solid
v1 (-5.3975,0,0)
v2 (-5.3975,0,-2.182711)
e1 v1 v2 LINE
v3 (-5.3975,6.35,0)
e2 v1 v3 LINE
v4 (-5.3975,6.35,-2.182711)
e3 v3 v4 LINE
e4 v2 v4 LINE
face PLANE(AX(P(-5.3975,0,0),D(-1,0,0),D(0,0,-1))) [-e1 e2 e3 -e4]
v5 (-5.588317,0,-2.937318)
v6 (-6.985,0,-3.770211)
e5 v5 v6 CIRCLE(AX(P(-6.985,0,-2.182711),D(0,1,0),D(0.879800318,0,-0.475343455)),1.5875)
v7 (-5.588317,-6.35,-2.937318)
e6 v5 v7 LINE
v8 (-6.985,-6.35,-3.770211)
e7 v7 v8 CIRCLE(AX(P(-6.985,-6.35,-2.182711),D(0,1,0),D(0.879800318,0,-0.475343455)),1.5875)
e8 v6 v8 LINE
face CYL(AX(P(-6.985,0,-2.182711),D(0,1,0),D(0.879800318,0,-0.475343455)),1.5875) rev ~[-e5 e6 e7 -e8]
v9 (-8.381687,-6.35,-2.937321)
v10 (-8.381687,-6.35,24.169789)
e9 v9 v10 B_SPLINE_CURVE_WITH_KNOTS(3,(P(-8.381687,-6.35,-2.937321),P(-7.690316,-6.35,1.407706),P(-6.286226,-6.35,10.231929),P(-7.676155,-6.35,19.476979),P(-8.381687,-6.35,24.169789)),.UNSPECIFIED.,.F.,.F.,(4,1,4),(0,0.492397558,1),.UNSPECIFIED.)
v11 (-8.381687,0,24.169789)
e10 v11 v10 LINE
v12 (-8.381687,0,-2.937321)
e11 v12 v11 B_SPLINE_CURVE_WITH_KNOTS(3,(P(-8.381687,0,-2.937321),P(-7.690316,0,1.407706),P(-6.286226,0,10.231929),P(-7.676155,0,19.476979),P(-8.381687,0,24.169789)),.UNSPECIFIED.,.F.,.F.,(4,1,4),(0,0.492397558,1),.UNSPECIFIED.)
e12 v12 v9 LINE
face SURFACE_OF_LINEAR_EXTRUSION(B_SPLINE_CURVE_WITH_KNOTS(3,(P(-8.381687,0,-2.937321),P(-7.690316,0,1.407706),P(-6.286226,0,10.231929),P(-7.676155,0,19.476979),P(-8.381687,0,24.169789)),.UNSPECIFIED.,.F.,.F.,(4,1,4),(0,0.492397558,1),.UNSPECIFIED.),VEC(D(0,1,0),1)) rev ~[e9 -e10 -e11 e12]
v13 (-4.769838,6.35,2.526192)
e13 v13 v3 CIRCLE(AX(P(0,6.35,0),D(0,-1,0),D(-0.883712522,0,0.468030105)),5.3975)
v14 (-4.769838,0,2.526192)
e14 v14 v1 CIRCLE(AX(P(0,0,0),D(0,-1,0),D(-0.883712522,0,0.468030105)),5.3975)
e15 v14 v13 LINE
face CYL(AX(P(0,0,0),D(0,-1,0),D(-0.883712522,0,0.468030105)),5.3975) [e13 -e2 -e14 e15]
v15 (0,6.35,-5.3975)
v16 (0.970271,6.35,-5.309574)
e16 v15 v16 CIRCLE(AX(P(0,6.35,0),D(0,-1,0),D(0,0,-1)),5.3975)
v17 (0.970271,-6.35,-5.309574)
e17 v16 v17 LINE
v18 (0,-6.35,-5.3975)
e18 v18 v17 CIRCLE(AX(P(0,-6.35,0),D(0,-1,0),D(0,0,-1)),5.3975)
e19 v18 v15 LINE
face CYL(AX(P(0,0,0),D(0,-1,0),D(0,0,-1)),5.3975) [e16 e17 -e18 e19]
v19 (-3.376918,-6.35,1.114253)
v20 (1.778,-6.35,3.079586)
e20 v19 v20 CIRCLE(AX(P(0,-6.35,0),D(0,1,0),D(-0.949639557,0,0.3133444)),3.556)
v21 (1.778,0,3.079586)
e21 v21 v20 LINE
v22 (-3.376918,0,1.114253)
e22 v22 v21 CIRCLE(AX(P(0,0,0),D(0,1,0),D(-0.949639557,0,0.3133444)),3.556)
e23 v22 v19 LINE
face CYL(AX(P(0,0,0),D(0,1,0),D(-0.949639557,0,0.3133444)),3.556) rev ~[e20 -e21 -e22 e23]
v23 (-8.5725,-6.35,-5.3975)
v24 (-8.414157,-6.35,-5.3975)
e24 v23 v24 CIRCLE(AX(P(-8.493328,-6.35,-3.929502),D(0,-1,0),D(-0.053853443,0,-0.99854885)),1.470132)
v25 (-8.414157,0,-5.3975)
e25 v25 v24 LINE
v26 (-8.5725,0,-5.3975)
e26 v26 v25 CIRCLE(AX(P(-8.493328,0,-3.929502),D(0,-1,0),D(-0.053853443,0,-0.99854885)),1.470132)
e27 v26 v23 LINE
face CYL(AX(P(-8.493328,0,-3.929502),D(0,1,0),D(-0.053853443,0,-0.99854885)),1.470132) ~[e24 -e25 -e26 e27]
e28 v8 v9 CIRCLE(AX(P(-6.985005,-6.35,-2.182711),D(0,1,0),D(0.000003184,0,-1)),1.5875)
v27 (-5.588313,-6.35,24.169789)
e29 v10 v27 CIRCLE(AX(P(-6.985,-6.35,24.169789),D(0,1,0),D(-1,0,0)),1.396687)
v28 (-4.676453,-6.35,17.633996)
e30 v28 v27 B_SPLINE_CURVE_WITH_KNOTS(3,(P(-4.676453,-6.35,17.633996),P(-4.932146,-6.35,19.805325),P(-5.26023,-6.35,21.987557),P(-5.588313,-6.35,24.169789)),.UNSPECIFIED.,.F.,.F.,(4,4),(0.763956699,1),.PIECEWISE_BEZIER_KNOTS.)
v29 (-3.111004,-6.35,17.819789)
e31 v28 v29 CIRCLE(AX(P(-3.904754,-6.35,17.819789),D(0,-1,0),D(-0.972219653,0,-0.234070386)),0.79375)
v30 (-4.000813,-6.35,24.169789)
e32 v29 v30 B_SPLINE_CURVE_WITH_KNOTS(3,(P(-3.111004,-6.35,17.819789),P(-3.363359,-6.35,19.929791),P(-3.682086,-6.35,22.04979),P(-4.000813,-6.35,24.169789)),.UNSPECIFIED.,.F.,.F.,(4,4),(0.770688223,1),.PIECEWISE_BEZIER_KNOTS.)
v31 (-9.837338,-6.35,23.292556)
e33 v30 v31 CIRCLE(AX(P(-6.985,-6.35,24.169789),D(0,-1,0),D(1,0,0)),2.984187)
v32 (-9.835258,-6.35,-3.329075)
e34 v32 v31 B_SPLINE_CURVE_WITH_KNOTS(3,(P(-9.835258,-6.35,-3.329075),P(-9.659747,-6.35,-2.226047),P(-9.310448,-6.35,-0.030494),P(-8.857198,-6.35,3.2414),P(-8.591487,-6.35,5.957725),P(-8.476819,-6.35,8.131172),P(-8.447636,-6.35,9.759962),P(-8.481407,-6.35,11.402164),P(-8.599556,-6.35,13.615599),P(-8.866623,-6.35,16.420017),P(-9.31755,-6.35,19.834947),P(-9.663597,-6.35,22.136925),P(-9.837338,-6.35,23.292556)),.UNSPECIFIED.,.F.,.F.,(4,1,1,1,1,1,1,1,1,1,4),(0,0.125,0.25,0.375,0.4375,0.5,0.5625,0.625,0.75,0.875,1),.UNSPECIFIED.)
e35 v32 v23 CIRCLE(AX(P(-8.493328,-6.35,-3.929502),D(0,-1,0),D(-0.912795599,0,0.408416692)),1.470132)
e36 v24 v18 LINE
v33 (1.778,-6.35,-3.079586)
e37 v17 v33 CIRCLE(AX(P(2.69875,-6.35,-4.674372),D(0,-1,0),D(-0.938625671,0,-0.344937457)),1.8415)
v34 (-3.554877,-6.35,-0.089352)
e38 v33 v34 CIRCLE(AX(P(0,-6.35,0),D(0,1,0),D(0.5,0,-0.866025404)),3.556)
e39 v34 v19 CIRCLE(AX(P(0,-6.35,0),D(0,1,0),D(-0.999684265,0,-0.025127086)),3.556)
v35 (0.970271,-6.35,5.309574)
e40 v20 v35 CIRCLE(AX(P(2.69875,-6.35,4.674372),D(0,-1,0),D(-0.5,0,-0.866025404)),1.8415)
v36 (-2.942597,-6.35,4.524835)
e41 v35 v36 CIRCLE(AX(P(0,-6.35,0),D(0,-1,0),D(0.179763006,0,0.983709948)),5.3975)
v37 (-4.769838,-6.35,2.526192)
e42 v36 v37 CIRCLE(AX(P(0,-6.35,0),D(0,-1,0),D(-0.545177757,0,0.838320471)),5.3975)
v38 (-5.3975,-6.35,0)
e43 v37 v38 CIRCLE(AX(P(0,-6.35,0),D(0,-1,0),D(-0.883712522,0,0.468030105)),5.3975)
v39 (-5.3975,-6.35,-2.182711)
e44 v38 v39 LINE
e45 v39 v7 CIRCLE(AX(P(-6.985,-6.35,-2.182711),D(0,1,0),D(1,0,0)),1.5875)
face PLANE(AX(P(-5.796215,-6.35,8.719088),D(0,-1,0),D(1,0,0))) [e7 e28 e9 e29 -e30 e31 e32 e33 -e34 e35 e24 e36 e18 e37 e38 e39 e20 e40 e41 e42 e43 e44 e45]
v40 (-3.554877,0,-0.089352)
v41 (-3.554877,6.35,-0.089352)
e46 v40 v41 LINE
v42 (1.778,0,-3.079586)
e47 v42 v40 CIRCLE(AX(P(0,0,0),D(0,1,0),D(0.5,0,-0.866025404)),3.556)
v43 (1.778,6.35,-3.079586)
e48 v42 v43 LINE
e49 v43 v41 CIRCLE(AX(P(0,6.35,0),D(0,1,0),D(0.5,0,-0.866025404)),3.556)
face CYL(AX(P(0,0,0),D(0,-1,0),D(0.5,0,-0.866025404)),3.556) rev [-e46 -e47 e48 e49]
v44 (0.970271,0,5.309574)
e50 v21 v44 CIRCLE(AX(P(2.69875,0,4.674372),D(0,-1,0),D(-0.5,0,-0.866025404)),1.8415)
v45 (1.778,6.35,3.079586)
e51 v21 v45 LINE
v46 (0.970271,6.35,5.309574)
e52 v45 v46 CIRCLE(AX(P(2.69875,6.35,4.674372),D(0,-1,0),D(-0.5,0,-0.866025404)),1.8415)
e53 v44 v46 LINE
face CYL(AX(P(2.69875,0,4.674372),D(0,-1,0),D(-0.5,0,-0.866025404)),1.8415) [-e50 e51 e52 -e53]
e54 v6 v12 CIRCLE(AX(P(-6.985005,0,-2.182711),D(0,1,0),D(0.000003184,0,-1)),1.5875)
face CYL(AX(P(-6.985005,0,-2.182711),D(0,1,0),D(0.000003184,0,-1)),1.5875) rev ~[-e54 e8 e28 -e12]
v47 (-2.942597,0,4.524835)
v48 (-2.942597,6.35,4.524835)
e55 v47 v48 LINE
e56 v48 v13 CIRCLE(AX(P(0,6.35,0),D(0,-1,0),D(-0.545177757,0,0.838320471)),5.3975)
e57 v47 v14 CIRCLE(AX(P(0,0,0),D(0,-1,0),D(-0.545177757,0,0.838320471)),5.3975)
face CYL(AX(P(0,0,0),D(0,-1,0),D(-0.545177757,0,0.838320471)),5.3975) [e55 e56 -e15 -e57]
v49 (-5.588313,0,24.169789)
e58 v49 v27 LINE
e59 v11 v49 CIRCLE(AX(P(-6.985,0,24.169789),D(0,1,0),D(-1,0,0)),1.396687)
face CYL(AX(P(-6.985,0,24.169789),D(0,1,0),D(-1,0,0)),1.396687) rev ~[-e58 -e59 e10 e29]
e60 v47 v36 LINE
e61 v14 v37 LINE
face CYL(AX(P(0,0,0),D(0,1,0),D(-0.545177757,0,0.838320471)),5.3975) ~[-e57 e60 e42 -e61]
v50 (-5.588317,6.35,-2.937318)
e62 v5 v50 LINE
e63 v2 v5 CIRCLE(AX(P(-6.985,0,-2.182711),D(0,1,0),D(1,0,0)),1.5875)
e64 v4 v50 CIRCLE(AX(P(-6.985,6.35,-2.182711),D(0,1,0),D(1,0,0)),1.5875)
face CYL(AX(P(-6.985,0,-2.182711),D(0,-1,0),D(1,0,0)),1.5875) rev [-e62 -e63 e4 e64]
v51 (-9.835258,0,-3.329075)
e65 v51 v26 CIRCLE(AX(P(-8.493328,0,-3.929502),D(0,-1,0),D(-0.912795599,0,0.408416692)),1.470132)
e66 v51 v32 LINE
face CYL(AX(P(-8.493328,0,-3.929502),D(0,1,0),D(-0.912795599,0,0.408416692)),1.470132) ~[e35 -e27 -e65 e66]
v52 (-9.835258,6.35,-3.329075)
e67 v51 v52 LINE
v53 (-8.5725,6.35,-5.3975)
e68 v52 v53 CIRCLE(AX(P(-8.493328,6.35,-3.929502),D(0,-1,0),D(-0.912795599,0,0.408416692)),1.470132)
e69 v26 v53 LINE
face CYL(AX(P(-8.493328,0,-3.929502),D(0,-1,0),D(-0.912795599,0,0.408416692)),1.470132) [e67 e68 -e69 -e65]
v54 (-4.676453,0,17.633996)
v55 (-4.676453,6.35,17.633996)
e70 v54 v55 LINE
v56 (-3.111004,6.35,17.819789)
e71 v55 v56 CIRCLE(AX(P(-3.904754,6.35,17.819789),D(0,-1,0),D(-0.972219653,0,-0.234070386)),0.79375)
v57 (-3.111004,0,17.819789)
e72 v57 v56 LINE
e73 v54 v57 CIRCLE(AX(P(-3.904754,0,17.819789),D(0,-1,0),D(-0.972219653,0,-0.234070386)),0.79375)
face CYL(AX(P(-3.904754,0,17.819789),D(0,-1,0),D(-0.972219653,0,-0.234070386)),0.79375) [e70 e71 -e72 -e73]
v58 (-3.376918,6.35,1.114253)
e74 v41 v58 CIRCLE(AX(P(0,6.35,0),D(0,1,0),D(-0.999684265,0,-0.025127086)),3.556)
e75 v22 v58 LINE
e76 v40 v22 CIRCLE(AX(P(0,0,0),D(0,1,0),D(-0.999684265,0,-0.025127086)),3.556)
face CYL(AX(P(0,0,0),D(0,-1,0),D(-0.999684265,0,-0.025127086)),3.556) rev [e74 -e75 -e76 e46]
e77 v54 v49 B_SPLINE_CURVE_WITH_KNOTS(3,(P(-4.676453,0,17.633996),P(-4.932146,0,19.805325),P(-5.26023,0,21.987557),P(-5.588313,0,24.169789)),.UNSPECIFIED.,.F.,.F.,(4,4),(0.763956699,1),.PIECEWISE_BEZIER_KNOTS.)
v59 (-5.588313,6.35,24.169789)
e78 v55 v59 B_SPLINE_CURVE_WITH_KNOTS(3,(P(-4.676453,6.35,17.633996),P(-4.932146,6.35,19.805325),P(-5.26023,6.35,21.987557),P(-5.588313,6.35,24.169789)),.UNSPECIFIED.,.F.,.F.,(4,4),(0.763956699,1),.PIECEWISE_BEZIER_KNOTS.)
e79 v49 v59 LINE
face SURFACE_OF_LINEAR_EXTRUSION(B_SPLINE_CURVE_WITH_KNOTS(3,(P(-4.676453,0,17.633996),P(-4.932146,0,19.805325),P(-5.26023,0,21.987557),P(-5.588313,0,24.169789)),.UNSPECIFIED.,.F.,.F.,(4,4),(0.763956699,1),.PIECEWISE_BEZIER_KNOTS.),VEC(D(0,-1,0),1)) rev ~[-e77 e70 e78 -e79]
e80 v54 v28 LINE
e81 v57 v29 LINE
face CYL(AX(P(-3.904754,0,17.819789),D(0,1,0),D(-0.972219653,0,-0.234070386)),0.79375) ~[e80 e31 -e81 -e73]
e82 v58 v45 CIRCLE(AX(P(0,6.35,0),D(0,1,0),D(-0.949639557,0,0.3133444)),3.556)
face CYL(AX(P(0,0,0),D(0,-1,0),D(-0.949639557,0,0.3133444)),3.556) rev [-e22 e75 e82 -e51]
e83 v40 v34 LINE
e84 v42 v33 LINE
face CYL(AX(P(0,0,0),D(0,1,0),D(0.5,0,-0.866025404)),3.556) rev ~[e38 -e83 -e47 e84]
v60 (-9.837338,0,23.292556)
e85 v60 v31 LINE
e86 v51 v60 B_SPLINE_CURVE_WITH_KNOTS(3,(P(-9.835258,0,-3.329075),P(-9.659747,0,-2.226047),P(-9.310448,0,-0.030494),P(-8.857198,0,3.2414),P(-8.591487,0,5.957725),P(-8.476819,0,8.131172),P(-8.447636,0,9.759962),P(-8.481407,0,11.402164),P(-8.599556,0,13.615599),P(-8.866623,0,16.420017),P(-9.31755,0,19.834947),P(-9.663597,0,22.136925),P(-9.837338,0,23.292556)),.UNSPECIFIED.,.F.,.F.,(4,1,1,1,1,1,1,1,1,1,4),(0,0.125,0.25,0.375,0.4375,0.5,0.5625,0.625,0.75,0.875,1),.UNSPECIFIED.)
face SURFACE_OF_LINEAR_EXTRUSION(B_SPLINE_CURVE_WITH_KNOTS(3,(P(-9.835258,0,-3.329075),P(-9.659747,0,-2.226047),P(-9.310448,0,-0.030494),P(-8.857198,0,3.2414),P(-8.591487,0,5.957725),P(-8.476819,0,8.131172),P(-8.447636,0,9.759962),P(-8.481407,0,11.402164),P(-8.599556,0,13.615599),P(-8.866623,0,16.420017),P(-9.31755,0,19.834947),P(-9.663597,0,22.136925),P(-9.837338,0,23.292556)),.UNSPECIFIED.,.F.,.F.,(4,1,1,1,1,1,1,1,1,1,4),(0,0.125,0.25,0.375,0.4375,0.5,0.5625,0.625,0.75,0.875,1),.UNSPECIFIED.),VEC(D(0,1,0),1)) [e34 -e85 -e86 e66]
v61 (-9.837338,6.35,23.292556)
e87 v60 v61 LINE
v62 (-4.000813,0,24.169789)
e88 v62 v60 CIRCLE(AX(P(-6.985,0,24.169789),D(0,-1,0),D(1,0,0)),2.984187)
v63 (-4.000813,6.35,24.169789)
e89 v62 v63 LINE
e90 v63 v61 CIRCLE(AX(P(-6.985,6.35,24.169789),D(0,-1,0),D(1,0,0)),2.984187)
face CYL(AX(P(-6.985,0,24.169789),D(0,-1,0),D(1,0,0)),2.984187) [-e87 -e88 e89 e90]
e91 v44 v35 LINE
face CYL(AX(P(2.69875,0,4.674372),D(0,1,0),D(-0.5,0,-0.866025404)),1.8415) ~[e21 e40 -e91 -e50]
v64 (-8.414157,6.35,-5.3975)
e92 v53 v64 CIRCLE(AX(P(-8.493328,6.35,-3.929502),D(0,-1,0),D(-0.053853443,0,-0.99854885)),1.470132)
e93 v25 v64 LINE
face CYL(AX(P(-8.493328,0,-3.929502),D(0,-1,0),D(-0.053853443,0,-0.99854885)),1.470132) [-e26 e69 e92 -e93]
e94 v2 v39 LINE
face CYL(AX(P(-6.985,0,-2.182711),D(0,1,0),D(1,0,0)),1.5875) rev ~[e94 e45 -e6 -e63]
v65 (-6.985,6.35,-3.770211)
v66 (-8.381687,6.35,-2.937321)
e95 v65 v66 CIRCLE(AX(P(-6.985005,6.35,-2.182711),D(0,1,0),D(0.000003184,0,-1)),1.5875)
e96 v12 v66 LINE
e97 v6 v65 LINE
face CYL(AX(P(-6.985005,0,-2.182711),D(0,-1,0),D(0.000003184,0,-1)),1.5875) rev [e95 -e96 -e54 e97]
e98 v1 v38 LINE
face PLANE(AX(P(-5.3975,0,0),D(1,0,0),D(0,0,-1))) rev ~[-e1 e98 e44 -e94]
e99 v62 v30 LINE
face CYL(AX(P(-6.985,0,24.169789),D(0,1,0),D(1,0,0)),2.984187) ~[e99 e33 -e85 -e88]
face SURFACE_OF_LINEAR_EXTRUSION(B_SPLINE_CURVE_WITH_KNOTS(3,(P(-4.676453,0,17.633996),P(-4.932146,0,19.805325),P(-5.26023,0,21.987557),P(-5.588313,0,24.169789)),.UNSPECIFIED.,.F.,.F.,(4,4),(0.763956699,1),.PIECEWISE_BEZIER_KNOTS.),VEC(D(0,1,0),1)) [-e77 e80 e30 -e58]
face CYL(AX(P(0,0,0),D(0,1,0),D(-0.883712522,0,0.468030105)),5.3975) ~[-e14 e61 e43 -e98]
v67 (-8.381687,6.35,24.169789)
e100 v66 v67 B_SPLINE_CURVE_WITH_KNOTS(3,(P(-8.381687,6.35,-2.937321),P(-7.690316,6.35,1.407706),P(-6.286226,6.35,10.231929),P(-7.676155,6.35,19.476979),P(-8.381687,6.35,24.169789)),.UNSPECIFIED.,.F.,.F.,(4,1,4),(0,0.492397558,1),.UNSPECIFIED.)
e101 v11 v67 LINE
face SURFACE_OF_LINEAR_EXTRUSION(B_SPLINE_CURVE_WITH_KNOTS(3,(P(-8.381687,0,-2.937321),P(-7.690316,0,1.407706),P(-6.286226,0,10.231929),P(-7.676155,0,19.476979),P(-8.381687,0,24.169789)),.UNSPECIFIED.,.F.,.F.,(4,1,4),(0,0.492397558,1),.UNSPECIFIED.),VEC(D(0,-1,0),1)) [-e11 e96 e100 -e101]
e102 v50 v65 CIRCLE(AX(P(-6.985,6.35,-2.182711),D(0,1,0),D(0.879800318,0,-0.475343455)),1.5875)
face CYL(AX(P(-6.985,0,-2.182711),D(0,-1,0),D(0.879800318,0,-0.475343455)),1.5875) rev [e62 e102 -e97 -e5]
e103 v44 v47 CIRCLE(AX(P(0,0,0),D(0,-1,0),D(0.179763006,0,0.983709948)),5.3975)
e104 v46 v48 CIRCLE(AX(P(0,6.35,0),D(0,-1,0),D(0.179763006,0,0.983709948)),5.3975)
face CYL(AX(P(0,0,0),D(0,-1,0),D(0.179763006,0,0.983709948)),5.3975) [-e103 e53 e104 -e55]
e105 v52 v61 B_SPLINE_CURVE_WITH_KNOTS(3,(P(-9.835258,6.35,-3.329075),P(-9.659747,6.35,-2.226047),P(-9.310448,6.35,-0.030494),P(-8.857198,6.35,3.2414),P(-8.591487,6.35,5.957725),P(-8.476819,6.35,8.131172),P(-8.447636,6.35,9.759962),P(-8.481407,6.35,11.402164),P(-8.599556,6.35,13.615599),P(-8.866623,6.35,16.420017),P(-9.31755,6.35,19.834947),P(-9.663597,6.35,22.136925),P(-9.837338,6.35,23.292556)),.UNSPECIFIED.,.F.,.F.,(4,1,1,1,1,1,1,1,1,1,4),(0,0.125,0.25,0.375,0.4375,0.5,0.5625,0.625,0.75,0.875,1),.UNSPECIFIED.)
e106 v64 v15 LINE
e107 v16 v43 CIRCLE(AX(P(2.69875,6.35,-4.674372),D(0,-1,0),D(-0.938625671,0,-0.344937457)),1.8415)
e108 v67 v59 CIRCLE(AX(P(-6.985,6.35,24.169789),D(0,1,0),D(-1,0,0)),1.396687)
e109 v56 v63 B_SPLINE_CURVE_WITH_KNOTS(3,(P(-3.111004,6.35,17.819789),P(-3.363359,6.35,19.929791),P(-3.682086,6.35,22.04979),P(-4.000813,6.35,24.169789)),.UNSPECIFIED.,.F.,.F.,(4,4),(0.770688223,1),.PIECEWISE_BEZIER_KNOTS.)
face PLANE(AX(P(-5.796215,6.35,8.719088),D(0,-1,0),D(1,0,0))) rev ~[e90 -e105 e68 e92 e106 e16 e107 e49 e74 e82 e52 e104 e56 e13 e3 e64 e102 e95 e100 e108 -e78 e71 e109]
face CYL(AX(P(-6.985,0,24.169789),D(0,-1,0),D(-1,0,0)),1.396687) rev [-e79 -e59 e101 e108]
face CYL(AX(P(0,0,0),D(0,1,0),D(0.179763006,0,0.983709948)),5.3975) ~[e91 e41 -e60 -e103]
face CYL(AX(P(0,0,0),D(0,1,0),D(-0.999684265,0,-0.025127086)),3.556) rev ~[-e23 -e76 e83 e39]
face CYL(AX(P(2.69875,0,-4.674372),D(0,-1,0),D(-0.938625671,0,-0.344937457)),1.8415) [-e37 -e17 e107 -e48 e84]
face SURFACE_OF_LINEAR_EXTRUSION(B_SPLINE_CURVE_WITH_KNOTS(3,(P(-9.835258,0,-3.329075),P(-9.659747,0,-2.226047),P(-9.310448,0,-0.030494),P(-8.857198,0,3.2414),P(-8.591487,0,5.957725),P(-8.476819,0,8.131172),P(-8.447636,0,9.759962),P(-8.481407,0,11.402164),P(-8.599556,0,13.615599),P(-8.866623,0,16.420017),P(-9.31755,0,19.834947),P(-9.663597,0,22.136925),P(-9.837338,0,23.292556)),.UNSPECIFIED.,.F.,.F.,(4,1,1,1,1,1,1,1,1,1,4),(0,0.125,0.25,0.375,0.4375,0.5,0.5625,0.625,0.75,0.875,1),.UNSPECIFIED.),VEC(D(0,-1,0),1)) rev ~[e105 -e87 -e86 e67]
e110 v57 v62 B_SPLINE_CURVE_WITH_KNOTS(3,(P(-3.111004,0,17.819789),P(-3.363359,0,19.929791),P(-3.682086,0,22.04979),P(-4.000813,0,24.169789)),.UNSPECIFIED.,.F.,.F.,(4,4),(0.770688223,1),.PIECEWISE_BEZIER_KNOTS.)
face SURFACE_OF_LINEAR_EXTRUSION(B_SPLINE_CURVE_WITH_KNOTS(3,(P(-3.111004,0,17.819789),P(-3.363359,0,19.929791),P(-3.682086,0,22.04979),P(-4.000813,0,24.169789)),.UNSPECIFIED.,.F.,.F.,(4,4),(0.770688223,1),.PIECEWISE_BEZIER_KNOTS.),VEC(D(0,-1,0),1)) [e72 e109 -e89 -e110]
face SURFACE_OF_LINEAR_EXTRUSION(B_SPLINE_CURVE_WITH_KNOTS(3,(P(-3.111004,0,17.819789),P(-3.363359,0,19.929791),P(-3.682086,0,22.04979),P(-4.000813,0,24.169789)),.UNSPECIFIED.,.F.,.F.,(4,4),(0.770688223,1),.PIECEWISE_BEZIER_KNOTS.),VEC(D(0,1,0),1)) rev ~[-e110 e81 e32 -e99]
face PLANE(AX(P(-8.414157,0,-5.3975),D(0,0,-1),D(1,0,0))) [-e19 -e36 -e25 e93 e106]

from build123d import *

# Parameters (mm, degrees)
F1_DEPTH = 6.35


# Not quite as in the source:
# - ends of sketch curves that miss each other by under 0.0002 mm in the source are joined
# - the dataset's text gives a spline's control points without its knots; the knots are read off the source's solid


with BuildPart() as f1:
    # F0 (on Front) → F1 (new body, symmetric)
    with BuildSketch(Plane.XZ):
        with BuildLine():
            Line((-8.4141566916, -5.3975), (0, -5.3975))
            ThreePointArc((0, -5.3975), (0.4871232852, -5.375473668), (0.9702708263, -5.3095744437))
            ThreePointArc((0.9702708263, -5.3095744437), (4.4301700946, -5.3015138122), (1.778, -3.0795863359))
            ThreePointArc((1.778, -3.0795863359), (-1.7391660801, -3.101682986), (-3.5548772461, -0.0893519188))
            ThreePointArc((-3.5548772461, -0.0893519188), (-3.5177568499, 0.5201180106), (-3.3769182629, 1.1142526848))
            add(Edge.make_bspline(
                [(-3.3769182629, 1.1142526848), (-3.213886893, 2.2483634663), (-3.0651248799, 3.384623456), (-2.942596945, 4.524834745)],
                knots=[0.1529319216, 0.1529319216, 0.1529319216, 0.1529319216, 0.2811638974, 0.2811638974, 0.2811638974, 0.2811638974], degree=3))
            ThreePointArc((-2.942596945, 4.524834745), (-3.9835985246, 3.6419704892), (-4.7698383359, 2.5261924906))
            add(Edge.make_bspline(
                [(-5.3975, -1.7347033349), (-5.173779235, -0.3165887052), (-4.9567128934, 1.1025281941), (-4.7698383359, 2.5261924906)],
                knots=[0.0454256059, 0.0454256059, 0.0454256059, 0.0454256059, 0.2061005135, 0.2061005135, 0.2061005135, 0.2061005135], degree=3))
            Line((-5.3975, -1.7347033349), (-5.3975, -2.1827106738))
            ThreePointArc((-5.3975, -2.1827106738), (-5.4459433862, -2.5718905674), (-5.5883169948, -2.9373184082))
            ThreePointArc((-5.5883169948, -2.9373184082), (-6.1719143737, -3.5461797839), (-6.985, -3.7702106738))
            ThreePointArc((-6.985, -3.7702106738), (-7.7980896495, -3.5461803993), (-8.3816869181, -2.9373205224))
            add(Edge.make_bspline(
                [(-8.3816869181, -2.9373205224), (-7.6903162591, 1.4077055077), (-6.2862259108, 10.2319288559), (-7.676155344, 19.4769791983), (-8.3816869181, 24.1697893262)],
                knots=[0, 0, 0, 0, 0.4923975582, 1, 1, 1, 1], degree=3))
            ThreePointArc((-8.3816869181, 24.1697893262), (-6.985, 25.5664762444), (-5.5883130819, 24.1697893263))
            add(Edge.make_bspline(
                [(-4.676452861, 17.6339959576), (-4.9321460197, 19.8053249313), (-5.2602295508, 21.9875571288), (-5.5883130819, 24.1697893263)],
                knots=[0.7639566994, 0.7639566994, 0.7639566994, 0.7639566994, 1, 1, 1, 1], degree=3))
            ThreePointArc((-4.676452861, 17.6339959576), (-3.8112048513, 17.0315712658), (-3.1110035111, 17.8197893262))
            add(Edge.make_bspline(
                [(-3.1110035111, 17.8197893262), (-3.3633587069, 19.9297914909), (-3.6820858944, 22.0497904085), (-4.0008130819, 24.1697893262)],
                knots=[0.7706882235, 0.7706882235, 0.7706882235, 0.7706882235, 1, 1, 1, 1], degree=3))
            ThreePointArc((-4.0008130819, 24.1697893262), (-7.4285431353, 27.1208299985), (-9.837338265, 23.292556185))
            add(Edge.make_bspline(
                [(-9.8352581181, -3.3290753137), (-9.6597468246, -2.2260473952), (-9.3104483349, -0.0304942675), (-8.8571977057, 3.2414000554), (-8.5914867755, 5.9577245973), (-8.4768185316, 8.1311720824), (-8.4476359431, 9.7599621423), (-8.4814070197, 11.4021639111), (-8.5995564813, 13.6155987531), (-8.8666228021, 16.4200169888), (-9.3175498954, 19.8349473194), (-9.6635970859, 22.1369248922), (-9.837338265, 23.292556185)],
                knots=[0, 0, 0, 0, 0.125, 0.25, 0.375, 0.4375, 0.5, 0.5625, 0.625, 0.75, 0.875, 1, 1, 1, 1], degree=3))
            ThreePointArc((-9.8352581181, -3.3290753137), (-9.7481101941, -4.6955367779), (-8.5725, -5.3975))
            Line((-8.5725, -5.3975), (-8.4141566916, -5.3975))
        make_face()
        with BuildLine():
            ThreePointArc((-8.5725, -5.3975), (-8.4933283458, -5.399633381), (-8.4141566916, -5.3975))
            Line((-8.4141566916, -5.3975), (-8.5725, -5.3975))
        make_face()
        with BuildLine():
            add(Edge.make_bspline(
                [(-3.3769182629, 1.1142526848), (-3.213886893, 2.2483634663), (-3.0651248799, 3.384623456), (-2.942596945, 4.524834745)],
                knots=[0.1529319216, 0.1529319216, 0.1529319216, 0.1529319216, 0.2811638974, 0.2811638974, 0.2811638974, 0.2811638974], degree=3))
            ThreePointArc((-3.3769182629, 1.1142526848), (-1.2667947714, 3.3227047728), (1.778, 3.0795863359))
            ThreePointArc((1.778, 3.0795863359), (4.4301700946, 5.3015138122), (0.9702708263, 5.3095744437))
            ThreePointArc((0.9702708263, 5.3095744437), (-1.0613537009, 5.2921200451), (-2.942596945, 4.524834745))
        make_face()
        with BuildLine():
            add(Edge.make_bspline(
                [(-5.3975, -1.7347033349), (-5.173779235, -0.3165887052), (-4.9567128934, 1.1025281941), (-4.7698383359, 2.5261924906)],
                knots=[0.0454256059, 0.0454256059, 0.0454256059, 0.0454256059, 0.2061005135, 0.2061005135, 0.2061005135, 0.2061005135], degree=3))
            ThreePointArc((-4.7698383359, 2.5261924906), (-5.2382348491, 1.3014998717), (-5.3975, 0))
            Line((-5.3975, 0), (-5.3975, -1.7347033349))
        make_face()
    extrude(amount=F1_DEPTH, both=True)


solid = f1.part
